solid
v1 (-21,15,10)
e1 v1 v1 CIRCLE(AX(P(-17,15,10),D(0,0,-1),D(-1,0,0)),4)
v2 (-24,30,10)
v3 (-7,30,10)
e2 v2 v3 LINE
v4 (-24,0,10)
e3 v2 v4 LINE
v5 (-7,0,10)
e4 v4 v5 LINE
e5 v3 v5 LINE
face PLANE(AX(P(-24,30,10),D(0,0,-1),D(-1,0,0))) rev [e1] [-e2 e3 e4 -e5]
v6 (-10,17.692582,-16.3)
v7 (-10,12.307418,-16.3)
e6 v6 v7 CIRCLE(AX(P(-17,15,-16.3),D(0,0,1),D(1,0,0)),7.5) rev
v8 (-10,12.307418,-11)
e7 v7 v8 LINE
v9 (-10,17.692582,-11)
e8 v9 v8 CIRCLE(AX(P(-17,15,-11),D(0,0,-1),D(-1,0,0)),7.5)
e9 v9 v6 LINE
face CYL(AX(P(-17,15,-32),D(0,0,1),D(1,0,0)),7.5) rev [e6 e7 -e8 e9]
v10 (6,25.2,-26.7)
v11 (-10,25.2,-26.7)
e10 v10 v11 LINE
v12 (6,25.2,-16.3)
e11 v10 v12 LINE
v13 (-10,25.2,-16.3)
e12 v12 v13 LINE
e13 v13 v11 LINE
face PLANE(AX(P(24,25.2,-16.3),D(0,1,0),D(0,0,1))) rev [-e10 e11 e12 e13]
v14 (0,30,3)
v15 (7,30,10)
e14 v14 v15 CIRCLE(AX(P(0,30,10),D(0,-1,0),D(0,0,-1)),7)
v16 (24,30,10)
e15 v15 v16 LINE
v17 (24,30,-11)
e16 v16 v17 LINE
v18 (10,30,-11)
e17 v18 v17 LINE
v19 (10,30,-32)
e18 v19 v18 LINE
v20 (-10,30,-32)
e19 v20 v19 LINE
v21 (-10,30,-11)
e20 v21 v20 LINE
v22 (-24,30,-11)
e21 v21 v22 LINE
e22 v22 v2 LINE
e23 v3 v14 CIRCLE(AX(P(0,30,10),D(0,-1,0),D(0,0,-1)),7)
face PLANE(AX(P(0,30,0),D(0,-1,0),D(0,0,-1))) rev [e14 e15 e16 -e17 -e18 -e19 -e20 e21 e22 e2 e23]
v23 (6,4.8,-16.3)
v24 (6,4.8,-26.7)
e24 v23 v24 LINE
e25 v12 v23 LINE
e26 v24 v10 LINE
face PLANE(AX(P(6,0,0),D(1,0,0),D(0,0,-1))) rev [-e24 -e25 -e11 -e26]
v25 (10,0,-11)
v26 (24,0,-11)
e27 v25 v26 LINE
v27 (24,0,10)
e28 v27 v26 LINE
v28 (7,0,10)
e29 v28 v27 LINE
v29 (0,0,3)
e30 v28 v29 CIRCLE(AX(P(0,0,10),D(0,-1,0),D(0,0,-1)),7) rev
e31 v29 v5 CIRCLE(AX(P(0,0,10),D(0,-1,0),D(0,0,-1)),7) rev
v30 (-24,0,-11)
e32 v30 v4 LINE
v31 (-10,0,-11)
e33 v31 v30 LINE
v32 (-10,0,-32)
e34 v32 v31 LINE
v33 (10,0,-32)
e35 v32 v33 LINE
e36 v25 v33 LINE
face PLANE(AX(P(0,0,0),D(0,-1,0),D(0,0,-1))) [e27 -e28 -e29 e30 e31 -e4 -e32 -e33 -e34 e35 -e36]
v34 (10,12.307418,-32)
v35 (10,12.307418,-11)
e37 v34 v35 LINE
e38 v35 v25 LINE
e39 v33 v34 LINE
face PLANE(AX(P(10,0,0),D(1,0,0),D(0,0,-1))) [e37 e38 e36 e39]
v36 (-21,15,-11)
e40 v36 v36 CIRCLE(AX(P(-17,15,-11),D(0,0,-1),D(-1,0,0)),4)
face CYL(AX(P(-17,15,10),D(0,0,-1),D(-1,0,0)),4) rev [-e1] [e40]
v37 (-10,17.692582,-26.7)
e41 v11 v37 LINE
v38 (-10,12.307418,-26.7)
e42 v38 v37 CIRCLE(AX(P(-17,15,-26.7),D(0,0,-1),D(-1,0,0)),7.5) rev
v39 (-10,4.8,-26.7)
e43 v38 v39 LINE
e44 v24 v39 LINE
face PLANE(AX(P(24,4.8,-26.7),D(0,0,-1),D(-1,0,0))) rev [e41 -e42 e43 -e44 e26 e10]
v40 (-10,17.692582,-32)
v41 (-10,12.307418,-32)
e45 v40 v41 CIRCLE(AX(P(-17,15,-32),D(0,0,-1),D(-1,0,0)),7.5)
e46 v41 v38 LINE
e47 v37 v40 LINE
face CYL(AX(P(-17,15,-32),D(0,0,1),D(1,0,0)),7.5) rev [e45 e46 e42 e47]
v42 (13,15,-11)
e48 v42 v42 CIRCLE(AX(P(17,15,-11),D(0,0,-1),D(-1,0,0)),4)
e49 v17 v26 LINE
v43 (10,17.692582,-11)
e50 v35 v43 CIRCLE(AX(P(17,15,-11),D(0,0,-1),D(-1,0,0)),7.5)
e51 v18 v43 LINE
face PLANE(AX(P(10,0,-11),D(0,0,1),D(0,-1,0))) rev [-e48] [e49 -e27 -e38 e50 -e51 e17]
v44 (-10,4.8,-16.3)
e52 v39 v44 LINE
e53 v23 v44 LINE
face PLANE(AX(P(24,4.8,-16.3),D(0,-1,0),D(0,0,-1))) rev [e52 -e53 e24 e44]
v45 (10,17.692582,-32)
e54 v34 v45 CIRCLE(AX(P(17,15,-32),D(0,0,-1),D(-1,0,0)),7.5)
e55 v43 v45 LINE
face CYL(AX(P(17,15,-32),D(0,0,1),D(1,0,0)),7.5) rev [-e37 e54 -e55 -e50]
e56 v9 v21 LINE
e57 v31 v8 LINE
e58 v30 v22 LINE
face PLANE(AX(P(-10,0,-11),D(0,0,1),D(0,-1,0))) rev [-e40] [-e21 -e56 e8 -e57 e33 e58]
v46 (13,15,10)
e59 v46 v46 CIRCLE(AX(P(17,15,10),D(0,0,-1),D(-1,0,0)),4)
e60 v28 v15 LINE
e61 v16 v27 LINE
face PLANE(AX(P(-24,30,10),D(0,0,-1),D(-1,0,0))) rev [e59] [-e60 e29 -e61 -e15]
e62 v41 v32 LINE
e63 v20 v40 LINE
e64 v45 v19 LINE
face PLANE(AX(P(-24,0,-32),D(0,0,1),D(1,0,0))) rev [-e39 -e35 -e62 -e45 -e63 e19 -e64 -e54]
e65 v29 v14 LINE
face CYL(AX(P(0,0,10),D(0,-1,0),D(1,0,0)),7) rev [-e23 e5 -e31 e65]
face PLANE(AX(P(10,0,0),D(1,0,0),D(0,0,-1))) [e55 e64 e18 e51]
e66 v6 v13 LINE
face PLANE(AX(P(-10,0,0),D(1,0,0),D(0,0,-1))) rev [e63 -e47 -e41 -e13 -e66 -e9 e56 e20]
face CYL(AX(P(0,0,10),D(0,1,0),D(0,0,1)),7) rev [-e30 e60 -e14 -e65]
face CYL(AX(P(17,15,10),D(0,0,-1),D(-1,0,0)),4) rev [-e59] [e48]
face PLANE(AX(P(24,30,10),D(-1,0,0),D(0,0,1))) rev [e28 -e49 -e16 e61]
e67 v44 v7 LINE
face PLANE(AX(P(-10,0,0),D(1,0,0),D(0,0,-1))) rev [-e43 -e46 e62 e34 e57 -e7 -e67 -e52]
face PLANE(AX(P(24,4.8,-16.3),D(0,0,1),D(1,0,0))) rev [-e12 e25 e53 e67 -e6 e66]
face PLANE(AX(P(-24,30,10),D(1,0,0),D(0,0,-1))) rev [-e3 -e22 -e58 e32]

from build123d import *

# Parameters (mm, degrees)
SKETCH_1_W          = 48
SKETCH_1_H          = 20
EXTRUDE_1_DEPTH     = 30
SKETCH_2_W          = 14
SKETCH_2_H          = 30
CUT_EXTRUDE_1_DEPTH = 7
SKETCH_7_W          = 22
SKETCH_7_H          = 30
EXTRUDE_2_DEPTH     = 48
SKETCH_8_W          = 21
SKETCH_8_H          = 30
CUT_EXTRUDE_2_DEPTH = 14
SKETCH_9_W          = 21
SKETCH_9_H          = 30
CUT_EXTRUDE_3_DEPTH = 14
SKETCH_11_W         = 10.4
SKETCH_11_H         = 20.4
CUT_EXTRUDE_4_DEPTH = 56.497747702
SKETCH_13_R         = 4
CUT_EXTRUDE_5_DEPTH = 44.783558558
SKETCH_14_R         = 4
CUT_EXTRUDE_6_DEPTH = 44.783558558
FILLET_1_R          = 7
SKETCH1_W           = 10.4
SKETCH1_H           = 20.4
BOSS_EXTRUDE1_DEPTH = 4
SKETCH_20_R         = 7.5
CUT_EXTRUDE_8_DEPTH = 44.783558558


with BuildPart() as part:
    # Эскиз1 → Бобышка-Вытянуть1 (new body)
    with BuildSketch(Plane(origin=(0, 0, 0), x_dir=(1, 0, 0), z_dir=(0, 1, 0))):
        Rectangle(SKETCH_1_W, SKETCH_1_H)
    extrude(amount=EXTRUDE_1_DEPTH)

    # Эскиз2 → Вырез-Вытянуть1 (cut)
    with BuildSketch(Plane.XY.offset(10)):
        with Locations((0, 15)):
            Rectangle(SKETCH_2_W, SKETCH_2_H)
    extrude(amount=-CUT_EXTRUDE_1_DEPTH, mode=Mode.SUBTRACT)

    # Эскиз7 → Бобышка-Вытянуть2 (add)
    with BuildSketch(Plane(origin=(24, 0, 0), x_dir=(0, 0, -1), z_dir=(1, 0, 0))):
        with Locations((21, 15)):
            Rectangle(SKETCH_7_W, SKETCH_7_H)
    extrude(amount=-EXTRUDE_2_DEPTH)

    # Эскиз8 → Вырез-Вытянуть2 (cut)
    with BuildSketch(Plane(origin=(24, 0, 0), x_dir=(0, 0, -1), z_dir=(1, 0, 0))):
        with Locations((21.5, 15)):
            Rectangle(SKETCH_8_W, SKETCH_8_H)
    extrude(amount=-CUT_EXTRUDE_2_DEPTH, mode=Mode.SUBTRACT)

    # Эскиз9 → Вырез-Вытянуть3 (cut)
    with BuildSketch(Plane.ZY.offset(24)):
        with Locations((-21.5, 15)):
            Rectangle(SKETCH_9_W, SKETCH_9_H)
    extrude(amount=-CUT_EXTRUDE_3_DEPTH, mode=Mode.SUBTRACT)

    # Эскиз11 → Вырез-Вытянуть4 (cut, through all)
    with BuildSketch(Plane.ZY.offset(10)):
        with Locations((-21.5, 15)):
            Rectangle(SKETCH_11_W, SKETCH_11_H)
    extrude(amount=-CUT_EXTRUDE_4_DEPTH, mode=Mode.SUBTRACT)

    # Эскиз13 → Вырез-Вытянуть5 (cut, through all)
    with BuildSketch(Plane(origin=(0, 0, -11), x_dir=(-1, 0, 0), z_dir=(0, 0, -1))):
        with Locations((17, 15)):
            Circle(SKETCH_13_R)
    extrude(amount=-CUT_EXTRUDE_5_DEPTH, mode=Mode.SUBTRACT)

    # Эскиз14 → Вырез-Вытянуть6 (cut, through all)
    with BuildSketch(Plane(origin=(0, 0, -11), x_dir=(-1, 0, 0), z_dir=(0, 0, -1))):
        with Locations((-17, 15)):
            Circle(SKETCH_14_R)
    extrude(amount=-CUT_EXTRUDE_6_DEPTH, mode=Mode.SUBTRACT)

    # Скругление1
    fillet_1_edges = [part.edges().sort_by_distance(p)[0] for p in [
        (-7, 15, 3),
        (7, 15, 3),
    ]]
    fillet(fillet_1_edges, radius=FILLET_1_R - 0.0001)  # a hair under: the kernel refuses the full size

    # Sketch1 → Boss-Extrude1 (add)
    with BuildSketch(Plane(origin=(10, 0, 0), x_dir=(0, 0, -1), z_dir=(1, 0, 0))):
        with Locations((21.5, 15)):
            Rectangle(SKETCH1_W, SKETCH1_H)
    extrude(amount=-BOSS_EXTRUDE1_DEPTH)

    # Эскиз20 → Вырез-Вытянуть8 (cut, through all)
    with BuildSketch(Plane(origin=(0, 0, -11), x_dir=(-1, 0, 0), z_dir=(0, 0, -1))):
        with Locations((-17, 15)):
            Circle(SKETCH_20_R)
        with Locations((17, 15)):
            Circle(SKETCH_20_R)
    extrude(amount=CUT_EXTRUDE_8_DEPTH, mode=Mode.SUBTRACT)


solid = part.part
